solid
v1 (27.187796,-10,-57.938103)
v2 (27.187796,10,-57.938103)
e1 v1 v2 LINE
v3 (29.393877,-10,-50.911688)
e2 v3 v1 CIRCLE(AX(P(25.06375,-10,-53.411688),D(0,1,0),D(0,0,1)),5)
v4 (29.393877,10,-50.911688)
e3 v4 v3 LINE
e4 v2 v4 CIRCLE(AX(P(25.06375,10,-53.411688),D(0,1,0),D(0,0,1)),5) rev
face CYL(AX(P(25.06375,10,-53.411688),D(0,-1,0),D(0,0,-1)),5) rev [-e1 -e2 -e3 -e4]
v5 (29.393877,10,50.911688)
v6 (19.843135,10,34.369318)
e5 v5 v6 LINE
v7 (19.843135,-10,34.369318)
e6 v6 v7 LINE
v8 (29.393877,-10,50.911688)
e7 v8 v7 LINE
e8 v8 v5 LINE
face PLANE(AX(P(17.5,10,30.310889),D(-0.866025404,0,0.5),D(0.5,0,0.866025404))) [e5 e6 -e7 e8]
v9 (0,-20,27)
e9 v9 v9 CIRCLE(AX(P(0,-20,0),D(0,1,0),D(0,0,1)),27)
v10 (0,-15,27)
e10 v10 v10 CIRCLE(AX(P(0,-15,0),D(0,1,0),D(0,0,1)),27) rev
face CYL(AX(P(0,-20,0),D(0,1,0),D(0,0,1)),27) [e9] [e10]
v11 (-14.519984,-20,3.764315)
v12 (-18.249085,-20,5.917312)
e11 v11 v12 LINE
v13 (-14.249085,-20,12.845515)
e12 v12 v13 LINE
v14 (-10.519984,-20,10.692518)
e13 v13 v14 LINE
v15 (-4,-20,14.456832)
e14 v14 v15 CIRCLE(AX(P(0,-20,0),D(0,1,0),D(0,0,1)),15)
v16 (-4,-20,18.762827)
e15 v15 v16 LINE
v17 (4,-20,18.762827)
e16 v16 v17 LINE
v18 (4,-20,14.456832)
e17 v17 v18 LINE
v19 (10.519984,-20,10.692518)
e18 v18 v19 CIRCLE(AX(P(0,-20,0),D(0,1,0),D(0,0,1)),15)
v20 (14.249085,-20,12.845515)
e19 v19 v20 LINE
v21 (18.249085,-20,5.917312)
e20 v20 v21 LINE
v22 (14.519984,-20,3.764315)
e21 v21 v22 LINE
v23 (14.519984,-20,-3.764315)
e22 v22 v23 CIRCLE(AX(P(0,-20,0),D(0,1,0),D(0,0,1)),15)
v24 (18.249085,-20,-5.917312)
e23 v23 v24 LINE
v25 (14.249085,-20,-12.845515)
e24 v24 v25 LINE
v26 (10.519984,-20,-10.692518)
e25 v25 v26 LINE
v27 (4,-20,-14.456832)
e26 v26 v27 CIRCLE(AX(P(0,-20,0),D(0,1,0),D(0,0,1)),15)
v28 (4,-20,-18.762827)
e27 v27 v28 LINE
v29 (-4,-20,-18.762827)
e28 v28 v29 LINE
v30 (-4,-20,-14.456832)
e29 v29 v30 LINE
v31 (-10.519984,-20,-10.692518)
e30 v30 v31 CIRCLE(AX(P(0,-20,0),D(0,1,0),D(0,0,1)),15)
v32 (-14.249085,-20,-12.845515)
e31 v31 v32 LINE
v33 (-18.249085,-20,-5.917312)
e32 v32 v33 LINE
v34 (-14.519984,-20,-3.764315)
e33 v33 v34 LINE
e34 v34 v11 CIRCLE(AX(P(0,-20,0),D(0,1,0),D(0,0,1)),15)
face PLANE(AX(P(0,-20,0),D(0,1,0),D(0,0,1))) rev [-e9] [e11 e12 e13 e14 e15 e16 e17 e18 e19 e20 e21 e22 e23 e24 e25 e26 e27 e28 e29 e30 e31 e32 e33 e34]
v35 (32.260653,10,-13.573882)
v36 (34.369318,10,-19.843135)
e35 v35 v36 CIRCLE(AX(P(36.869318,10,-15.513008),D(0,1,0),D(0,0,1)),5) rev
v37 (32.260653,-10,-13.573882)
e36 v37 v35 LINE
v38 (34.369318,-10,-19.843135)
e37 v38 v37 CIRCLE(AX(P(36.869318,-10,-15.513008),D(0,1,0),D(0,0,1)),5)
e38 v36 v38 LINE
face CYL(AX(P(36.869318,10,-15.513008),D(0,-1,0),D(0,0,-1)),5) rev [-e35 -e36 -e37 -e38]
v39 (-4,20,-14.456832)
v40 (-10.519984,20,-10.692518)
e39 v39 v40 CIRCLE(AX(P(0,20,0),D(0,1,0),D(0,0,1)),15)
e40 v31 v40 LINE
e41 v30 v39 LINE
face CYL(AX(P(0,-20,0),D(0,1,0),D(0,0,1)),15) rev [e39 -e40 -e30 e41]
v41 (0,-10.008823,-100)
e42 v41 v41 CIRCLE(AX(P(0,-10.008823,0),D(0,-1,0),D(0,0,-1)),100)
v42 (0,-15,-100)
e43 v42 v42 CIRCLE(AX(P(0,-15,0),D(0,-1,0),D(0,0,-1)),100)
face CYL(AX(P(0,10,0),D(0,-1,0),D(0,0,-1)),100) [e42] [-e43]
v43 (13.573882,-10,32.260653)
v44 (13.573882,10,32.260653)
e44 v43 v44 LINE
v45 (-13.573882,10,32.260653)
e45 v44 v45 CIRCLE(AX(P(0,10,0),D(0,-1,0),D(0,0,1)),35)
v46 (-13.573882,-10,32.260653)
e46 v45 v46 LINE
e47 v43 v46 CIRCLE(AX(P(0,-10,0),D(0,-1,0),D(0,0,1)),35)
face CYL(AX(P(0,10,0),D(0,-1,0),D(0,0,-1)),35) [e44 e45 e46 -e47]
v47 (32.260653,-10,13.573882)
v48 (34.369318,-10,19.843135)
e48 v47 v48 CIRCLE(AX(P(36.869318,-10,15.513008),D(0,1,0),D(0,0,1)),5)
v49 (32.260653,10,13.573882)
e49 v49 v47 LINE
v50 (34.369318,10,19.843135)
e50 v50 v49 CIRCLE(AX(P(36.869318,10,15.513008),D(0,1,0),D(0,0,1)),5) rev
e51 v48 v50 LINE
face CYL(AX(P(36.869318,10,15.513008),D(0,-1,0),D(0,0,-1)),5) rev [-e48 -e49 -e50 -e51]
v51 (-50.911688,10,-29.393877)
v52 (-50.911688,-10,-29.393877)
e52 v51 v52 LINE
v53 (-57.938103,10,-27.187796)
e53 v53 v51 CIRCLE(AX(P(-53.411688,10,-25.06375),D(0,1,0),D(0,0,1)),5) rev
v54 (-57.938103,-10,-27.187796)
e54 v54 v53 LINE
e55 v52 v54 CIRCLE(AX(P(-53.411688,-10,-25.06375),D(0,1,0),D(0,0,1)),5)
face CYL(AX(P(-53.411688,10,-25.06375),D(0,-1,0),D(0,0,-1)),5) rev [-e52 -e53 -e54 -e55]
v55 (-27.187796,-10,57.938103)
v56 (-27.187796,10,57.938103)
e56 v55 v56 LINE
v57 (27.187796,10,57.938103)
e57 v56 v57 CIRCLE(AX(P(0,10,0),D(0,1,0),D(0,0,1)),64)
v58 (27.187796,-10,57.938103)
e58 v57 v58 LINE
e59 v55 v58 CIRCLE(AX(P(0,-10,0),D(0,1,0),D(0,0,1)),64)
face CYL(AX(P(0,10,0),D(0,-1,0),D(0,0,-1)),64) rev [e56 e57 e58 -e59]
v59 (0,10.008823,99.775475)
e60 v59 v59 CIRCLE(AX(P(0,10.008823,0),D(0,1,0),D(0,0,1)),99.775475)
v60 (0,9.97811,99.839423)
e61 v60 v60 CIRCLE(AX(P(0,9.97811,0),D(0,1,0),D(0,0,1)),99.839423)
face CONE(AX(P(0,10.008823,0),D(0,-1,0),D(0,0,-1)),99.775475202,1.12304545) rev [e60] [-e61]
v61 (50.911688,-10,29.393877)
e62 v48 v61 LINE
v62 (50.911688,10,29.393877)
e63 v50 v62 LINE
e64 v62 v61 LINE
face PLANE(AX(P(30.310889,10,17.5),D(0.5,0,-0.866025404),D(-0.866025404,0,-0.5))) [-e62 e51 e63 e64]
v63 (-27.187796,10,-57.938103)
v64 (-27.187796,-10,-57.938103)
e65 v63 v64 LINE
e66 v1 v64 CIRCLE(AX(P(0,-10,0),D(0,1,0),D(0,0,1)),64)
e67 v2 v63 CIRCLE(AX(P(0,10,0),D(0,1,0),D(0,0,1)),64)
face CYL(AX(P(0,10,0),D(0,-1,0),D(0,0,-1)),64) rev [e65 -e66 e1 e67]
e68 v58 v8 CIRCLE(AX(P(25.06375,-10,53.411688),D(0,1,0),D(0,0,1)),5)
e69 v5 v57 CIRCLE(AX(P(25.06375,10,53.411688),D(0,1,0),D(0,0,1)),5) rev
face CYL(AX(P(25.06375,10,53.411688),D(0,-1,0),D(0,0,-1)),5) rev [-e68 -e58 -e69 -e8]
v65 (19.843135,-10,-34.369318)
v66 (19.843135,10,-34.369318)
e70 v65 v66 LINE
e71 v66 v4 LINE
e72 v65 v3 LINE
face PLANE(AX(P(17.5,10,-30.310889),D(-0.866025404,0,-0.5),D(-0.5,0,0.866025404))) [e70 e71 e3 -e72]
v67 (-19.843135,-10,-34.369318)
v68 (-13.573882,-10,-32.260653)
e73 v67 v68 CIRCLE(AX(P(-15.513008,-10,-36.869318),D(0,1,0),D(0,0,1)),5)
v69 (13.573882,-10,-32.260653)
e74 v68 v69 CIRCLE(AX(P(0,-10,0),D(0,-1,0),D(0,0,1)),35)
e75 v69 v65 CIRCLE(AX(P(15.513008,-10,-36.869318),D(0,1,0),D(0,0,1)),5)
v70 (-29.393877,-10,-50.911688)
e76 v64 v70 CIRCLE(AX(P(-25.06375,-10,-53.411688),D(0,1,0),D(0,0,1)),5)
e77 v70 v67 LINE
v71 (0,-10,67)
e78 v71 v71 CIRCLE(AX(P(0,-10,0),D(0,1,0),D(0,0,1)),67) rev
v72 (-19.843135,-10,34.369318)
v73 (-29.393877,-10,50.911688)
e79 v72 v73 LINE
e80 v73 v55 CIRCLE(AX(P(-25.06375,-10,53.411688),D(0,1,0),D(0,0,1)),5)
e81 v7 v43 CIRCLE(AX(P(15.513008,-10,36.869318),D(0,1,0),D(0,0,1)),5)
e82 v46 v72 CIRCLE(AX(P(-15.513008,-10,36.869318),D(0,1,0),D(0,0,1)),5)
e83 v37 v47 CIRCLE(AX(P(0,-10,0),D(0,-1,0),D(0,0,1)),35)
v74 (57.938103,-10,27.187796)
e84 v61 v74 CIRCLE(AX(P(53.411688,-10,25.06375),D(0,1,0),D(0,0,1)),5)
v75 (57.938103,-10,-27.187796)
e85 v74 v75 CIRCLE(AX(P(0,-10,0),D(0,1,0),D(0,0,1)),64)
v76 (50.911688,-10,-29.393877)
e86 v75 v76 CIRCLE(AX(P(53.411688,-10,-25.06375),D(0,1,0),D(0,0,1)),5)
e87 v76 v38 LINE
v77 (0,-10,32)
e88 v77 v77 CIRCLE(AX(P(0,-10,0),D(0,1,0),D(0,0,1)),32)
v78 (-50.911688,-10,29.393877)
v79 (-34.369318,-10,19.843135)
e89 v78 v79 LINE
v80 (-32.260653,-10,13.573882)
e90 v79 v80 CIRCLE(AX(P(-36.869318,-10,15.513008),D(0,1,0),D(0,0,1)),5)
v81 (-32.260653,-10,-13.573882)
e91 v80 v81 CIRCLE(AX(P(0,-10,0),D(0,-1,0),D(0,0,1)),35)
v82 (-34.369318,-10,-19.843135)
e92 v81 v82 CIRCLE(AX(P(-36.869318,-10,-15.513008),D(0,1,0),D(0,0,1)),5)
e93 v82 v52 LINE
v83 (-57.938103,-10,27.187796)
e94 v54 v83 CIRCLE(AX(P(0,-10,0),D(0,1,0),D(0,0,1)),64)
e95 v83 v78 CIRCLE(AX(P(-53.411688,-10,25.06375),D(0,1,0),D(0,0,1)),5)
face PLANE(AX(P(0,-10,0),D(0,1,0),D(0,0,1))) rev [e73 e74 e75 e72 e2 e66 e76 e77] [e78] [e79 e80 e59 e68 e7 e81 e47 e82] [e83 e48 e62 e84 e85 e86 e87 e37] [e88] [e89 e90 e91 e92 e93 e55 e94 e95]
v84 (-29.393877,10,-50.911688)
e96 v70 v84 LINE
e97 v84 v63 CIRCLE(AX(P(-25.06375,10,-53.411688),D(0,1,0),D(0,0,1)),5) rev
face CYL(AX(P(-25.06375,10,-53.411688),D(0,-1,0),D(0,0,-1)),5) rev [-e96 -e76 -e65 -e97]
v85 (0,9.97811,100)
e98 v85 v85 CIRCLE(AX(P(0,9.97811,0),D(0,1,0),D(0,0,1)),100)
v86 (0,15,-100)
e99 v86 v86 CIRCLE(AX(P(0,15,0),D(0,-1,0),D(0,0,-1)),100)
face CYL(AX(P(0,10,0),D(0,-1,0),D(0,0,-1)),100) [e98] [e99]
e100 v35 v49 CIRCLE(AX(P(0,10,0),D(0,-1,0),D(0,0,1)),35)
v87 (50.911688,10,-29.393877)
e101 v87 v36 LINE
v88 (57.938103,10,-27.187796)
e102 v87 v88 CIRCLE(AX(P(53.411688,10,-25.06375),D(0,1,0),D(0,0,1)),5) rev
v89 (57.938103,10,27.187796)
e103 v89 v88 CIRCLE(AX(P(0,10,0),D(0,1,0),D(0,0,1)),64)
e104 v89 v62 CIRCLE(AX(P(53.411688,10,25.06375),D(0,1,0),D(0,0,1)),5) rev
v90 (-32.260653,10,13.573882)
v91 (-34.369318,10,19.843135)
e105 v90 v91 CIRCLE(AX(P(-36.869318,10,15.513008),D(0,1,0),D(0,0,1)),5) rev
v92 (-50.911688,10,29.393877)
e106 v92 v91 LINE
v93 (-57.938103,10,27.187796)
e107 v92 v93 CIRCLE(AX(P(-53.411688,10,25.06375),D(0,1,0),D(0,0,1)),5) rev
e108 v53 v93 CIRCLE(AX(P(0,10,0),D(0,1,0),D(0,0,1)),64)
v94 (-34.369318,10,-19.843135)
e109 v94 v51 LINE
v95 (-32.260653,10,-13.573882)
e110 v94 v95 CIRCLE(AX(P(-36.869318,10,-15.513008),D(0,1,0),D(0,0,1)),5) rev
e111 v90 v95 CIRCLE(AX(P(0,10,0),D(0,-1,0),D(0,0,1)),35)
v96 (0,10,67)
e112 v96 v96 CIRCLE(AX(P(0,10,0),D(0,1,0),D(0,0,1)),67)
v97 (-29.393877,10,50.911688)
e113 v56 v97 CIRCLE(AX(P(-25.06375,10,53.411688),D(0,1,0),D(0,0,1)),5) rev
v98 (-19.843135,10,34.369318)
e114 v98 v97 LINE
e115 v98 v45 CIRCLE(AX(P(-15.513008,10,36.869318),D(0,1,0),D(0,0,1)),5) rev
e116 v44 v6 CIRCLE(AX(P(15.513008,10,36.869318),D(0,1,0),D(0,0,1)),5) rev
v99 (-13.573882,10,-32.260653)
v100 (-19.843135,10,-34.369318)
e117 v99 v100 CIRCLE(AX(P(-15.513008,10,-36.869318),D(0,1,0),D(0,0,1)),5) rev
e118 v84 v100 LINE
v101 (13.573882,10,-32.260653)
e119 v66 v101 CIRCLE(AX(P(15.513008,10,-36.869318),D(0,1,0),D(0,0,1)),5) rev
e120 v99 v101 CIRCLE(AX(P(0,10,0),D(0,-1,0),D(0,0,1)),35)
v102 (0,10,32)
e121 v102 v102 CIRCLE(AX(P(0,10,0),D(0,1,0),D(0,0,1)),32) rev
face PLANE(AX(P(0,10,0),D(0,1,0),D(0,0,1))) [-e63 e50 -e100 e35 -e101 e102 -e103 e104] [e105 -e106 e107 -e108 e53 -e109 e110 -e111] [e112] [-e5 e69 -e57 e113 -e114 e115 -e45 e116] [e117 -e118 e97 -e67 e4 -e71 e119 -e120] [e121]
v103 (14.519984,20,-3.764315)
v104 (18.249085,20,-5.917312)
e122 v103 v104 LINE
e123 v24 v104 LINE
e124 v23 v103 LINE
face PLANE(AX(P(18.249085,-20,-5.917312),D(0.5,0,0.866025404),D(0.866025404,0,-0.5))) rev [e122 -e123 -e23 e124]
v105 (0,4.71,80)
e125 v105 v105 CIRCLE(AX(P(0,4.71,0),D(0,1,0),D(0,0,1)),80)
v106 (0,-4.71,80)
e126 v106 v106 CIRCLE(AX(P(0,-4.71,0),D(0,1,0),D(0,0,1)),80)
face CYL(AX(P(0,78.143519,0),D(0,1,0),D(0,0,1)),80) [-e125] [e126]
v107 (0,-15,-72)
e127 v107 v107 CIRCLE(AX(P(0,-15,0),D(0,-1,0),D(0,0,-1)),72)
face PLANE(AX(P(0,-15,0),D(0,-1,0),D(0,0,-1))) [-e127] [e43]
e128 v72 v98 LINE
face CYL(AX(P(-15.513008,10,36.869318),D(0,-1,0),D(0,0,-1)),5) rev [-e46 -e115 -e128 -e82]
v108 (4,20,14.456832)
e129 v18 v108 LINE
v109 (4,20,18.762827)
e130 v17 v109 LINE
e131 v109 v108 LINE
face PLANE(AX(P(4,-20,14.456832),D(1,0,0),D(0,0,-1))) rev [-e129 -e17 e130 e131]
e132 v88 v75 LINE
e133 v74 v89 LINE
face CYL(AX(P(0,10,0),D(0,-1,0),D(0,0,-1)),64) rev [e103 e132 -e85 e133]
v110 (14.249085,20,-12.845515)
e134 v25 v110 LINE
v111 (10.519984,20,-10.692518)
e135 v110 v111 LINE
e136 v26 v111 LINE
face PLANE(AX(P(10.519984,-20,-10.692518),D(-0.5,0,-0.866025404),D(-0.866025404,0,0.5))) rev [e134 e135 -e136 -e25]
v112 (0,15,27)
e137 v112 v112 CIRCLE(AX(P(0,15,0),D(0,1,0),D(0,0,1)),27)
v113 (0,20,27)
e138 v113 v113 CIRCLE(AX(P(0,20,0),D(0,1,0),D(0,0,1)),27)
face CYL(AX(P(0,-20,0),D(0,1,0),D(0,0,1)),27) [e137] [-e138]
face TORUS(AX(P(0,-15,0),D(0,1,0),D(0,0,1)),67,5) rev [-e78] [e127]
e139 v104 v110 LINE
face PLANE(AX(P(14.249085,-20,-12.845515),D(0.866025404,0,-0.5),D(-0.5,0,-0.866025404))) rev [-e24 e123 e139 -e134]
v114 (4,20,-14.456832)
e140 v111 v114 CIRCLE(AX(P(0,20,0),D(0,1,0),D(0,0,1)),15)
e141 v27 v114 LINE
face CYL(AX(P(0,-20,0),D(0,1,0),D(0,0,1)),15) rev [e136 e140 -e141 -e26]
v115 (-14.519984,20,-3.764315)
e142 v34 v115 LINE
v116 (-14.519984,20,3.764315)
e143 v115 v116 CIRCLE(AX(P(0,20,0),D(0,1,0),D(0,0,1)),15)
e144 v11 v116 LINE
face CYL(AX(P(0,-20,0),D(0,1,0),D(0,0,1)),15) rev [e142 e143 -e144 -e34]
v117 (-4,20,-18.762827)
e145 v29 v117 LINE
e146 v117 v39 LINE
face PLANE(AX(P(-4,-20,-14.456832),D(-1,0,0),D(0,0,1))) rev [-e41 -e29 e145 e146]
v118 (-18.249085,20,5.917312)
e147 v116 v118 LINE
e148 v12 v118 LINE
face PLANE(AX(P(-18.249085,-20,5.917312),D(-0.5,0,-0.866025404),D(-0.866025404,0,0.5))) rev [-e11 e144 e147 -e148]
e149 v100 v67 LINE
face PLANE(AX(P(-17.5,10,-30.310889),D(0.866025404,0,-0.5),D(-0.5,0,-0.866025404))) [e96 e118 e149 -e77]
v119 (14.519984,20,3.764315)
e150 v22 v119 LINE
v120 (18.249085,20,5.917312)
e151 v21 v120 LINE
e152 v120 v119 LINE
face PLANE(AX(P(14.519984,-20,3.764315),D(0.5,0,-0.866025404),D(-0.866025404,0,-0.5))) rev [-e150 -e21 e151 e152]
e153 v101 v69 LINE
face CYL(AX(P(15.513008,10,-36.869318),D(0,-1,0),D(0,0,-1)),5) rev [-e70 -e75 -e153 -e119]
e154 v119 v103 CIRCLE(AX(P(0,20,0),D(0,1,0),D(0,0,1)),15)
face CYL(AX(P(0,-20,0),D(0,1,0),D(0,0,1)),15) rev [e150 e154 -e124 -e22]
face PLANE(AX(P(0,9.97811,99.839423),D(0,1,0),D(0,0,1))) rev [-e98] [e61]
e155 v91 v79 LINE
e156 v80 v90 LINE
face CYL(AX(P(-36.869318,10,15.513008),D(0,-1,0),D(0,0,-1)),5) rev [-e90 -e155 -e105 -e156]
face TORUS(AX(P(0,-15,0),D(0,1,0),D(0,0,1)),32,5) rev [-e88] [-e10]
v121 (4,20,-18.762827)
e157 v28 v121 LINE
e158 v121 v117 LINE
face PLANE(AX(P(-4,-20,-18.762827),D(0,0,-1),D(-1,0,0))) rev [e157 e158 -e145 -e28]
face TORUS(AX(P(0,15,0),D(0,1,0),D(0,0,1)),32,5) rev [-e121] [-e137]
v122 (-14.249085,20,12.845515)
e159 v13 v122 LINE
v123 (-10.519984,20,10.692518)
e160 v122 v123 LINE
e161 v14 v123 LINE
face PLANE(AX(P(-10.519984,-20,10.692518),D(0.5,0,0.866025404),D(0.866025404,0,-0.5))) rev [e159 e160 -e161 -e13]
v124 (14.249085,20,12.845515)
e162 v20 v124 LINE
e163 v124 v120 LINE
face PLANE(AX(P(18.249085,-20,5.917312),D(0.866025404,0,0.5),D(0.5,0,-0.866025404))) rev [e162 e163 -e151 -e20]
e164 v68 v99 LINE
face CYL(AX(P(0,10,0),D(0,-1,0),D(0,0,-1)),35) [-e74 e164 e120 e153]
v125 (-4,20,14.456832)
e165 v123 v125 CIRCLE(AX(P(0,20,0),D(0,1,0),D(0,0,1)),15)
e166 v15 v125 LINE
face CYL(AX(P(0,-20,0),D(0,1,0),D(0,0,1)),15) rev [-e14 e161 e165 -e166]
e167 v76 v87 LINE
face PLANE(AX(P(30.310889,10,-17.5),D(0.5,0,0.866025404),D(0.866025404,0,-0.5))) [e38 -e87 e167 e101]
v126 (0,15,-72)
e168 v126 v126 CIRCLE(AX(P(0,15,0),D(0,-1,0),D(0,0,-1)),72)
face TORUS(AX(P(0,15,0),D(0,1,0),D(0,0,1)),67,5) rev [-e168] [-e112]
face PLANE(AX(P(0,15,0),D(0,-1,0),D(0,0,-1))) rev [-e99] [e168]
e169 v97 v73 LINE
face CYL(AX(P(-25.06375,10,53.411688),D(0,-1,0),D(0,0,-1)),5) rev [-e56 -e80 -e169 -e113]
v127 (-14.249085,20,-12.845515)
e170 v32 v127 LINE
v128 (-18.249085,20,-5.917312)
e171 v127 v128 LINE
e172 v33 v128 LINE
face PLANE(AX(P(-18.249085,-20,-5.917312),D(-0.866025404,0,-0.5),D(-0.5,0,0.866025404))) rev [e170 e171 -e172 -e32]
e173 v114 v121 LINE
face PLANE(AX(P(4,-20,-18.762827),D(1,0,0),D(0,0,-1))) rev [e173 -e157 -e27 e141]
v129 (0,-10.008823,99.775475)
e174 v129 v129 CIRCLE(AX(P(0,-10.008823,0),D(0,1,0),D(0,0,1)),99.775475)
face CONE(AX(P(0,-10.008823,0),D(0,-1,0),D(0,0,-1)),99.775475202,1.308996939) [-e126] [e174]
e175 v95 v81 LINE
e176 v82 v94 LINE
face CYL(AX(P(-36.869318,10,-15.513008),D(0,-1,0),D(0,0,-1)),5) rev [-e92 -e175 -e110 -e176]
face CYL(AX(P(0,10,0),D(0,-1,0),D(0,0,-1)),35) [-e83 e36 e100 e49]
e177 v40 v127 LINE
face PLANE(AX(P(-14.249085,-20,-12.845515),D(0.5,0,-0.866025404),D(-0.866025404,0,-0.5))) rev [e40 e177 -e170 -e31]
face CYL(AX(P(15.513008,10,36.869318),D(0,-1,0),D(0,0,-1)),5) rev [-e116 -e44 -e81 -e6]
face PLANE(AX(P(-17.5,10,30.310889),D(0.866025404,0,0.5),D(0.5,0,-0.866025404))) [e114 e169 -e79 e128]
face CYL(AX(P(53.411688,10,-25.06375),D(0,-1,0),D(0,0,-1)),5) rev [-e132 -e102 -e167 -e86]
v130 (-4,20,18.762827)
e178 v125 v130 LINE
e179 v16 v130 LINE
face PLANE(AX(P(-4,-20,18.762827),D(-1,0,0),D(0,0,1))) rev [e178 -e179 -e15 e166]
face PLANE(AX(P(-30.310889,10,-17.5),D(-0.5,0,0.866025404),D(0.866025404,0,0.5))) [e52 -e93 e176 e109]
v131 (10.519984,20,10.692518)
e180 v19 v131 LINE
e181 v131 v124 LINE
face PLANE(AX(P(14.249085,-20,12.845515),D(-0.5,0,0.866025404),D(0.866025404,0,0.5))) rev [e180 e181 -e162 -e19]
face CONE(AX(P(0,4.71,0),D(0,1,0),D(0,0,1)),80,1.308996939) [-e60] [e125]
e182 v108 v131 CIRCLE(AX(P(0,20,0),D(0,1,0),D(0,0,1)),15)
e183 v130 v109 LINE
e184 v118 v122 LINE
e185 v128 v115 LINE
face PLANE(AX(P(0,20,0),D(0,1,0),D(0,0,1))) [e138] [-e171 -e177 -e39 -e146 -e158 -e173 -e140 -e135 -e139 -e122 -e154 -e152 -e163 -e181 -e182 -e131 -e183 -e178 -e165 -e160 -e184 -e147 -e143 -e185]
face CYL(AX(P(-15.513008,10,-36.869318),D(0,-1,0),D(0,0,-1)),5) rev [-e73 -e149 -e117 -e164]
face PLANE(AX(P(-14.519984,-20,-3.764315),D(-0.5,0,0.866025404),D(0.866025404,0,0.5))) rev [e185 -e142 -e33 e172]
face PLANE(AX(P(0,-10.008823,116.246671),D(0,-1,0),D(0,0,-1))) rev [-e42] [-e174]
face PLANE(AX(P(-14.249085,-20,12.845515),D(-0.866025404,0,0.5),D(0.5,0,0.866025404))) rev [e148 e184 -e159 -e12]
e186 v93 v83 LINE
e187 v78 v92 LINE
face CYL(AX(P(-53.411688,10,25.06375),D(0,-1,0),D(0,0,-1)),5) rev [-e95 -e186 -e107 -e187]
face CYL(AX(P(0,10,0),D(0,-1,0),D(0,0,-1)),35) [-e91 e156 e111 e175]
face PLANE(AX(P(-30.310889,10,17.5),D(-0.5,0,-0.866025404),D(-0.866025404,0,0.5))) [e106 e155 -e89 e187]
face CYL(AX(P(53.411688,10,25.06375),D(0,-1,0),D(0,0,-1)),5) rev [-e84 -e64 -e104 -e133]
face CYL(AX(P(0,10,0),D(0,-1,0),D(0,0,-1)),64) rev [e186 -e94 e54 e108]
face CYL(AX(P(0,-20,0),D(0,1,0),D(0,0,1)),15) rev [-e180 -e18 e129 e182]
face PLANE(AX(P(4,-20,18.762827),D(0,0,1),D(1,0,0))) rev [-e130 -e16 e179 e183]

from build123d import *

# Parameters (mm, degrees)
SKETCH1_R                 = 100
BOSS_EXTRUDE1_DEPTH       = 10
BOSS_EXTRUDE3_DEPTH       = 10
BOSS_EXTRUDE3_DEPTH_BACK  = 30
SKETCH2_R                 = 27
SKETCH4_R                 = 27
BOSS_EXTRUDE4_DEPTH       = 5
BOSS_EXTRUDE11_DEPTH      = 5
BOSS_EXTRUDE11_DEPTH_BACK = 25
SKETCH7_R                 = 100
SKETCH7_R_2               = 72
CUT_EXTRUDE1_DEPTH        = 147.969384567
FILLET1_R                 = 5
FILLET2_R                 = 5


with BuildPart() as part:
    # Sketch1 → Boss-Extrude1 (new, symmetric)
    with BuildSketch(Plane(origin=(0, 0, 0), x_dir=(1, 0, 0), z_dir=(0, 1, 0))):
        with Locations(Location((0, 0, 0), (0, 0, 270))):
            Circle(SKETCH1_R)
        with BuildLine():
            Line((-17.5, 30.310889132), (-32, 55.425625842))
            ThreePointArc((-32, 55.425625842), (0, 64), (32, 55.425625842))
            Line((32, 55.425625842), (17.5, 30.310889132))
            ThreePointArc((17.5, 30.310889132), (0, 35), (-17.5, 30.310889132))
        make_face(mode=Mode.SUBTRACT)
        with BuildLine():
            Line((30.310889132, 17.5), (55.425625842, 32))
            ThreePointArc((55.425625842, 32), (64, 0), (55.425625842, -32))
            Line((55.425625842, -32), (30.310889132, -17.5))
            ThreePointArc((30.310889132, -17.5), (35, 0), (30.310889132, 17.5))
        make_face(mode=Mode.SUBTRACT)
        with BuildLine():
            Line((17.5, -30.310889132), (32, -55.425625842))
            ThreePointArc((32, -55.425625842), (0, -64), (-32, -55.425625842))
            Line((-32, -55.425625842), (-17.5, -30.310889132))
            ThreePointArc((-17.5, -30.310889132), (0, -35), (17.5, -30.310889132))
        make_face(mode=Mode.SUBTRACT)
        with BuildLine():
            Line((-30.310889132, -17.5), (-55.425625842, -32))
            ThreePointArc((-55.425625842, -32), (-64, 0), (-55.425625842, 32))
            Line((-55.425625842, 32), (-30.310889132, 17.5))
            ThreePointArc((-30.310889132, 17.5), (-35, 0), (-30.310889132, -17.5))
        make_face(mode=Mode.SUBTRACT)
    extrude(amount=BOSS_EXTRUDE1_DEPTH, both=True)

    # Sketch2 → Boss-Extrude3 (add, two sides: drawn at the far end of the back side and taken through both)
    with BuildSketch(Plane(origin=(0, 10, 0), x_dir=(1, 0, 0), z_dir=(0, 1, 0)).offset(-BOSS_EXTRUDE3_DEPTH_BACK)):
        with Locations(Location((0, 0, 0), (0, 0, 270))):
            Circle(SKETCH2_R)
    extrude(amount=BOSS_EXTRUDE3_DEPTH + BOSS_EXTRUDE3_DEPTH_BACK)

    # Sketch4 → Boss-Extrude4 (add, symmetric)
    with BuildSketch(Plane.XZ.offset(10)):
        with Locations(Location((0, 0, 0), (0, 0, 90))):
            Circle(SKETCH4_R)
    extrude(amount=BOSS_EXTRUDE4_DEPTH, both=True)

    # Sketch7 → Boss-Extrude11 (add, two sides: drawn at the far end of the back side and taken through both)
    with BuildSketch(Plane.XZ.offset(10).offset(-BOSS_EXTRUDE11_DEPTH_BACK)):
        with Locations(Location((0, 0, 0), (0, 0, 270))):
            Circle(SKETCH7_R)
        with Locations(Location((0, 0, 0), (0, 0, 270))):
            Circle(SKETCH7_R_2, mode=Mode.SUBTRACT)
    extrude(amount=BOSS_EXTRUDE11_DEPTH + BOSS_EXTRUDE11_DEPTH_BACK)

    # Sketch8 → Cut-Extrude1 (cut, through all)
    with BuildSketch(Plane(origin=(0, 20, 0), x_dir=(1, 0, 0), z_dir=(0, 1, 0))):
        with BuildLine():
            Line((-4, 14.456832295), (-4, 18.762826765))
            Line((-4, 18.762826765), (4, 18.762826765))
            Line((4, 18.762826765), (4, 14.456832295))
            ThreePointArc((4, 14.456832295), (7.5, 12.990381057), (10.519984026, 10.692517763))
            Line((10.519984026, 10.692517763), (14.249084625, 12.845514997))
            Line((14.249084625, 12.845514997), (18.249084625, 5.917311767))
            Line((18.249084625, 5.917311767), (14.519984026, 3.764314532))
            ThreePointArc((14.519984026, 3.764314532), (15, 0), (14.519984026, -3.764314532))
            Line((14.519984026, -3.764314532), (18.249084625, -5.917311767))
            Line((18.249084625, -5.917311767), (14.249084625, -12.845514997))
            Line((14.249084625, -12.845514997), (10.519984026, -10.692517763))
            ThreePointArc((10.519984026, -10.692517763), (7.5, -12.990381057), (4, -14.456832295))
            Line((4, -14.456832295), (4, -18.762826765))
            Line((4, -18.762826765), (-4, -18.762826765))
            Line((-4, -18.762826765), (-4, -14.456832295))
            ThreePointArc((-4, -14.456832295), (-7.5, -12.990381057), (-10.519984026, -10.692517763))
            Line((-10.519984026, -10.692517763), (-14.249084625, -12.845514997))
            Line((-14.249084625, -12.845514997), (-18.249084625, -5.917311767))
            Line((-18.249084625, -5.917311767), (-14.519984026, -3.764314532))
            ThreePointArc((-14.519984026, -3.764314532), (-15, 0), (-14.519984026, 3.764314532))
            Line((-14.519984026, 3.764314532), (-18.249084625, 5.917311767))
            Line((-18.249084625, 5.917311767), (-14.249084625, 12.845514997))
            Line((-14.249084625, 12.845514997), (-10.519984026, 10.692517763))
            ThreePointArc((-10.519984026, 10.692517763), (-7.5, 12.990381057), (-4, 14.456832295))
        make_face()
    extrude(amount=-CUT_EXTRUDE1_DEPTH, mode=Mode.SUBTRACT)

    # Sketch9 → Cut-Revolve4 (revolve, cut)
    with BuildSketch(Plane(origin=(0, 0, 0), x_dir=(0, 0, -1), z_dir=(1, 0, 0))):
        Polygon((-80, 4.71), (-80, -4.71), (-99.775475202, -10.00882261), (-116.246670556, -10.00882261), (-116.246670556, 9.978109538), (-99.839422916, 9.978109538), (-99.775475202, 10.00882261), align=None)
    revolve(axis=Axis((0, 78.143519102, 0), (0, -1, 0)), mode=Mode.SUBTRACT)

    # Fillet1
    fillet1_edges = [part.edges().sort_by_distance(p)[0] for p in [
        (0, 10, -27),
        (0, -10, -27),
        (0, -10, 72),
        (0, 10, 72),
    ]]
    fillet(fillet1_edges, radius=FILLET1_R - 0.0001)  # a hair under: the kernel refuses the full size

    # Fillet2
    fillet2_edges = [part.edges().sort_by_distance(p)[0] for p in [
        (30.310889132, 0, -17.5),
        (30.310889132, 0, 17.5),
        (55.425625842, 0, 32),
        (55.425625842, 0, -32),
        (17.5, 0, 30.310889132),
        (-17.5, 0, 30.310889132),
        (-32, 0, 55.425625842),
        (32, 0, 55.425625842),
        (-30.310889132, 0, 17.5),
        (-30.310889132, 0, -17.5),
        (-55.425625842, 0, -32),
        (-55.425625842, 0, 32),
        (-17.5, 0, -30.310889132),
        (17.5, 0, -30.310889132),
        (32, 0, -55.425625842),
        (-32, 0, -55.425625842),
    ]]
    fillet(fillet2_edges, radius=FILLET2_R)


solid = part.part
